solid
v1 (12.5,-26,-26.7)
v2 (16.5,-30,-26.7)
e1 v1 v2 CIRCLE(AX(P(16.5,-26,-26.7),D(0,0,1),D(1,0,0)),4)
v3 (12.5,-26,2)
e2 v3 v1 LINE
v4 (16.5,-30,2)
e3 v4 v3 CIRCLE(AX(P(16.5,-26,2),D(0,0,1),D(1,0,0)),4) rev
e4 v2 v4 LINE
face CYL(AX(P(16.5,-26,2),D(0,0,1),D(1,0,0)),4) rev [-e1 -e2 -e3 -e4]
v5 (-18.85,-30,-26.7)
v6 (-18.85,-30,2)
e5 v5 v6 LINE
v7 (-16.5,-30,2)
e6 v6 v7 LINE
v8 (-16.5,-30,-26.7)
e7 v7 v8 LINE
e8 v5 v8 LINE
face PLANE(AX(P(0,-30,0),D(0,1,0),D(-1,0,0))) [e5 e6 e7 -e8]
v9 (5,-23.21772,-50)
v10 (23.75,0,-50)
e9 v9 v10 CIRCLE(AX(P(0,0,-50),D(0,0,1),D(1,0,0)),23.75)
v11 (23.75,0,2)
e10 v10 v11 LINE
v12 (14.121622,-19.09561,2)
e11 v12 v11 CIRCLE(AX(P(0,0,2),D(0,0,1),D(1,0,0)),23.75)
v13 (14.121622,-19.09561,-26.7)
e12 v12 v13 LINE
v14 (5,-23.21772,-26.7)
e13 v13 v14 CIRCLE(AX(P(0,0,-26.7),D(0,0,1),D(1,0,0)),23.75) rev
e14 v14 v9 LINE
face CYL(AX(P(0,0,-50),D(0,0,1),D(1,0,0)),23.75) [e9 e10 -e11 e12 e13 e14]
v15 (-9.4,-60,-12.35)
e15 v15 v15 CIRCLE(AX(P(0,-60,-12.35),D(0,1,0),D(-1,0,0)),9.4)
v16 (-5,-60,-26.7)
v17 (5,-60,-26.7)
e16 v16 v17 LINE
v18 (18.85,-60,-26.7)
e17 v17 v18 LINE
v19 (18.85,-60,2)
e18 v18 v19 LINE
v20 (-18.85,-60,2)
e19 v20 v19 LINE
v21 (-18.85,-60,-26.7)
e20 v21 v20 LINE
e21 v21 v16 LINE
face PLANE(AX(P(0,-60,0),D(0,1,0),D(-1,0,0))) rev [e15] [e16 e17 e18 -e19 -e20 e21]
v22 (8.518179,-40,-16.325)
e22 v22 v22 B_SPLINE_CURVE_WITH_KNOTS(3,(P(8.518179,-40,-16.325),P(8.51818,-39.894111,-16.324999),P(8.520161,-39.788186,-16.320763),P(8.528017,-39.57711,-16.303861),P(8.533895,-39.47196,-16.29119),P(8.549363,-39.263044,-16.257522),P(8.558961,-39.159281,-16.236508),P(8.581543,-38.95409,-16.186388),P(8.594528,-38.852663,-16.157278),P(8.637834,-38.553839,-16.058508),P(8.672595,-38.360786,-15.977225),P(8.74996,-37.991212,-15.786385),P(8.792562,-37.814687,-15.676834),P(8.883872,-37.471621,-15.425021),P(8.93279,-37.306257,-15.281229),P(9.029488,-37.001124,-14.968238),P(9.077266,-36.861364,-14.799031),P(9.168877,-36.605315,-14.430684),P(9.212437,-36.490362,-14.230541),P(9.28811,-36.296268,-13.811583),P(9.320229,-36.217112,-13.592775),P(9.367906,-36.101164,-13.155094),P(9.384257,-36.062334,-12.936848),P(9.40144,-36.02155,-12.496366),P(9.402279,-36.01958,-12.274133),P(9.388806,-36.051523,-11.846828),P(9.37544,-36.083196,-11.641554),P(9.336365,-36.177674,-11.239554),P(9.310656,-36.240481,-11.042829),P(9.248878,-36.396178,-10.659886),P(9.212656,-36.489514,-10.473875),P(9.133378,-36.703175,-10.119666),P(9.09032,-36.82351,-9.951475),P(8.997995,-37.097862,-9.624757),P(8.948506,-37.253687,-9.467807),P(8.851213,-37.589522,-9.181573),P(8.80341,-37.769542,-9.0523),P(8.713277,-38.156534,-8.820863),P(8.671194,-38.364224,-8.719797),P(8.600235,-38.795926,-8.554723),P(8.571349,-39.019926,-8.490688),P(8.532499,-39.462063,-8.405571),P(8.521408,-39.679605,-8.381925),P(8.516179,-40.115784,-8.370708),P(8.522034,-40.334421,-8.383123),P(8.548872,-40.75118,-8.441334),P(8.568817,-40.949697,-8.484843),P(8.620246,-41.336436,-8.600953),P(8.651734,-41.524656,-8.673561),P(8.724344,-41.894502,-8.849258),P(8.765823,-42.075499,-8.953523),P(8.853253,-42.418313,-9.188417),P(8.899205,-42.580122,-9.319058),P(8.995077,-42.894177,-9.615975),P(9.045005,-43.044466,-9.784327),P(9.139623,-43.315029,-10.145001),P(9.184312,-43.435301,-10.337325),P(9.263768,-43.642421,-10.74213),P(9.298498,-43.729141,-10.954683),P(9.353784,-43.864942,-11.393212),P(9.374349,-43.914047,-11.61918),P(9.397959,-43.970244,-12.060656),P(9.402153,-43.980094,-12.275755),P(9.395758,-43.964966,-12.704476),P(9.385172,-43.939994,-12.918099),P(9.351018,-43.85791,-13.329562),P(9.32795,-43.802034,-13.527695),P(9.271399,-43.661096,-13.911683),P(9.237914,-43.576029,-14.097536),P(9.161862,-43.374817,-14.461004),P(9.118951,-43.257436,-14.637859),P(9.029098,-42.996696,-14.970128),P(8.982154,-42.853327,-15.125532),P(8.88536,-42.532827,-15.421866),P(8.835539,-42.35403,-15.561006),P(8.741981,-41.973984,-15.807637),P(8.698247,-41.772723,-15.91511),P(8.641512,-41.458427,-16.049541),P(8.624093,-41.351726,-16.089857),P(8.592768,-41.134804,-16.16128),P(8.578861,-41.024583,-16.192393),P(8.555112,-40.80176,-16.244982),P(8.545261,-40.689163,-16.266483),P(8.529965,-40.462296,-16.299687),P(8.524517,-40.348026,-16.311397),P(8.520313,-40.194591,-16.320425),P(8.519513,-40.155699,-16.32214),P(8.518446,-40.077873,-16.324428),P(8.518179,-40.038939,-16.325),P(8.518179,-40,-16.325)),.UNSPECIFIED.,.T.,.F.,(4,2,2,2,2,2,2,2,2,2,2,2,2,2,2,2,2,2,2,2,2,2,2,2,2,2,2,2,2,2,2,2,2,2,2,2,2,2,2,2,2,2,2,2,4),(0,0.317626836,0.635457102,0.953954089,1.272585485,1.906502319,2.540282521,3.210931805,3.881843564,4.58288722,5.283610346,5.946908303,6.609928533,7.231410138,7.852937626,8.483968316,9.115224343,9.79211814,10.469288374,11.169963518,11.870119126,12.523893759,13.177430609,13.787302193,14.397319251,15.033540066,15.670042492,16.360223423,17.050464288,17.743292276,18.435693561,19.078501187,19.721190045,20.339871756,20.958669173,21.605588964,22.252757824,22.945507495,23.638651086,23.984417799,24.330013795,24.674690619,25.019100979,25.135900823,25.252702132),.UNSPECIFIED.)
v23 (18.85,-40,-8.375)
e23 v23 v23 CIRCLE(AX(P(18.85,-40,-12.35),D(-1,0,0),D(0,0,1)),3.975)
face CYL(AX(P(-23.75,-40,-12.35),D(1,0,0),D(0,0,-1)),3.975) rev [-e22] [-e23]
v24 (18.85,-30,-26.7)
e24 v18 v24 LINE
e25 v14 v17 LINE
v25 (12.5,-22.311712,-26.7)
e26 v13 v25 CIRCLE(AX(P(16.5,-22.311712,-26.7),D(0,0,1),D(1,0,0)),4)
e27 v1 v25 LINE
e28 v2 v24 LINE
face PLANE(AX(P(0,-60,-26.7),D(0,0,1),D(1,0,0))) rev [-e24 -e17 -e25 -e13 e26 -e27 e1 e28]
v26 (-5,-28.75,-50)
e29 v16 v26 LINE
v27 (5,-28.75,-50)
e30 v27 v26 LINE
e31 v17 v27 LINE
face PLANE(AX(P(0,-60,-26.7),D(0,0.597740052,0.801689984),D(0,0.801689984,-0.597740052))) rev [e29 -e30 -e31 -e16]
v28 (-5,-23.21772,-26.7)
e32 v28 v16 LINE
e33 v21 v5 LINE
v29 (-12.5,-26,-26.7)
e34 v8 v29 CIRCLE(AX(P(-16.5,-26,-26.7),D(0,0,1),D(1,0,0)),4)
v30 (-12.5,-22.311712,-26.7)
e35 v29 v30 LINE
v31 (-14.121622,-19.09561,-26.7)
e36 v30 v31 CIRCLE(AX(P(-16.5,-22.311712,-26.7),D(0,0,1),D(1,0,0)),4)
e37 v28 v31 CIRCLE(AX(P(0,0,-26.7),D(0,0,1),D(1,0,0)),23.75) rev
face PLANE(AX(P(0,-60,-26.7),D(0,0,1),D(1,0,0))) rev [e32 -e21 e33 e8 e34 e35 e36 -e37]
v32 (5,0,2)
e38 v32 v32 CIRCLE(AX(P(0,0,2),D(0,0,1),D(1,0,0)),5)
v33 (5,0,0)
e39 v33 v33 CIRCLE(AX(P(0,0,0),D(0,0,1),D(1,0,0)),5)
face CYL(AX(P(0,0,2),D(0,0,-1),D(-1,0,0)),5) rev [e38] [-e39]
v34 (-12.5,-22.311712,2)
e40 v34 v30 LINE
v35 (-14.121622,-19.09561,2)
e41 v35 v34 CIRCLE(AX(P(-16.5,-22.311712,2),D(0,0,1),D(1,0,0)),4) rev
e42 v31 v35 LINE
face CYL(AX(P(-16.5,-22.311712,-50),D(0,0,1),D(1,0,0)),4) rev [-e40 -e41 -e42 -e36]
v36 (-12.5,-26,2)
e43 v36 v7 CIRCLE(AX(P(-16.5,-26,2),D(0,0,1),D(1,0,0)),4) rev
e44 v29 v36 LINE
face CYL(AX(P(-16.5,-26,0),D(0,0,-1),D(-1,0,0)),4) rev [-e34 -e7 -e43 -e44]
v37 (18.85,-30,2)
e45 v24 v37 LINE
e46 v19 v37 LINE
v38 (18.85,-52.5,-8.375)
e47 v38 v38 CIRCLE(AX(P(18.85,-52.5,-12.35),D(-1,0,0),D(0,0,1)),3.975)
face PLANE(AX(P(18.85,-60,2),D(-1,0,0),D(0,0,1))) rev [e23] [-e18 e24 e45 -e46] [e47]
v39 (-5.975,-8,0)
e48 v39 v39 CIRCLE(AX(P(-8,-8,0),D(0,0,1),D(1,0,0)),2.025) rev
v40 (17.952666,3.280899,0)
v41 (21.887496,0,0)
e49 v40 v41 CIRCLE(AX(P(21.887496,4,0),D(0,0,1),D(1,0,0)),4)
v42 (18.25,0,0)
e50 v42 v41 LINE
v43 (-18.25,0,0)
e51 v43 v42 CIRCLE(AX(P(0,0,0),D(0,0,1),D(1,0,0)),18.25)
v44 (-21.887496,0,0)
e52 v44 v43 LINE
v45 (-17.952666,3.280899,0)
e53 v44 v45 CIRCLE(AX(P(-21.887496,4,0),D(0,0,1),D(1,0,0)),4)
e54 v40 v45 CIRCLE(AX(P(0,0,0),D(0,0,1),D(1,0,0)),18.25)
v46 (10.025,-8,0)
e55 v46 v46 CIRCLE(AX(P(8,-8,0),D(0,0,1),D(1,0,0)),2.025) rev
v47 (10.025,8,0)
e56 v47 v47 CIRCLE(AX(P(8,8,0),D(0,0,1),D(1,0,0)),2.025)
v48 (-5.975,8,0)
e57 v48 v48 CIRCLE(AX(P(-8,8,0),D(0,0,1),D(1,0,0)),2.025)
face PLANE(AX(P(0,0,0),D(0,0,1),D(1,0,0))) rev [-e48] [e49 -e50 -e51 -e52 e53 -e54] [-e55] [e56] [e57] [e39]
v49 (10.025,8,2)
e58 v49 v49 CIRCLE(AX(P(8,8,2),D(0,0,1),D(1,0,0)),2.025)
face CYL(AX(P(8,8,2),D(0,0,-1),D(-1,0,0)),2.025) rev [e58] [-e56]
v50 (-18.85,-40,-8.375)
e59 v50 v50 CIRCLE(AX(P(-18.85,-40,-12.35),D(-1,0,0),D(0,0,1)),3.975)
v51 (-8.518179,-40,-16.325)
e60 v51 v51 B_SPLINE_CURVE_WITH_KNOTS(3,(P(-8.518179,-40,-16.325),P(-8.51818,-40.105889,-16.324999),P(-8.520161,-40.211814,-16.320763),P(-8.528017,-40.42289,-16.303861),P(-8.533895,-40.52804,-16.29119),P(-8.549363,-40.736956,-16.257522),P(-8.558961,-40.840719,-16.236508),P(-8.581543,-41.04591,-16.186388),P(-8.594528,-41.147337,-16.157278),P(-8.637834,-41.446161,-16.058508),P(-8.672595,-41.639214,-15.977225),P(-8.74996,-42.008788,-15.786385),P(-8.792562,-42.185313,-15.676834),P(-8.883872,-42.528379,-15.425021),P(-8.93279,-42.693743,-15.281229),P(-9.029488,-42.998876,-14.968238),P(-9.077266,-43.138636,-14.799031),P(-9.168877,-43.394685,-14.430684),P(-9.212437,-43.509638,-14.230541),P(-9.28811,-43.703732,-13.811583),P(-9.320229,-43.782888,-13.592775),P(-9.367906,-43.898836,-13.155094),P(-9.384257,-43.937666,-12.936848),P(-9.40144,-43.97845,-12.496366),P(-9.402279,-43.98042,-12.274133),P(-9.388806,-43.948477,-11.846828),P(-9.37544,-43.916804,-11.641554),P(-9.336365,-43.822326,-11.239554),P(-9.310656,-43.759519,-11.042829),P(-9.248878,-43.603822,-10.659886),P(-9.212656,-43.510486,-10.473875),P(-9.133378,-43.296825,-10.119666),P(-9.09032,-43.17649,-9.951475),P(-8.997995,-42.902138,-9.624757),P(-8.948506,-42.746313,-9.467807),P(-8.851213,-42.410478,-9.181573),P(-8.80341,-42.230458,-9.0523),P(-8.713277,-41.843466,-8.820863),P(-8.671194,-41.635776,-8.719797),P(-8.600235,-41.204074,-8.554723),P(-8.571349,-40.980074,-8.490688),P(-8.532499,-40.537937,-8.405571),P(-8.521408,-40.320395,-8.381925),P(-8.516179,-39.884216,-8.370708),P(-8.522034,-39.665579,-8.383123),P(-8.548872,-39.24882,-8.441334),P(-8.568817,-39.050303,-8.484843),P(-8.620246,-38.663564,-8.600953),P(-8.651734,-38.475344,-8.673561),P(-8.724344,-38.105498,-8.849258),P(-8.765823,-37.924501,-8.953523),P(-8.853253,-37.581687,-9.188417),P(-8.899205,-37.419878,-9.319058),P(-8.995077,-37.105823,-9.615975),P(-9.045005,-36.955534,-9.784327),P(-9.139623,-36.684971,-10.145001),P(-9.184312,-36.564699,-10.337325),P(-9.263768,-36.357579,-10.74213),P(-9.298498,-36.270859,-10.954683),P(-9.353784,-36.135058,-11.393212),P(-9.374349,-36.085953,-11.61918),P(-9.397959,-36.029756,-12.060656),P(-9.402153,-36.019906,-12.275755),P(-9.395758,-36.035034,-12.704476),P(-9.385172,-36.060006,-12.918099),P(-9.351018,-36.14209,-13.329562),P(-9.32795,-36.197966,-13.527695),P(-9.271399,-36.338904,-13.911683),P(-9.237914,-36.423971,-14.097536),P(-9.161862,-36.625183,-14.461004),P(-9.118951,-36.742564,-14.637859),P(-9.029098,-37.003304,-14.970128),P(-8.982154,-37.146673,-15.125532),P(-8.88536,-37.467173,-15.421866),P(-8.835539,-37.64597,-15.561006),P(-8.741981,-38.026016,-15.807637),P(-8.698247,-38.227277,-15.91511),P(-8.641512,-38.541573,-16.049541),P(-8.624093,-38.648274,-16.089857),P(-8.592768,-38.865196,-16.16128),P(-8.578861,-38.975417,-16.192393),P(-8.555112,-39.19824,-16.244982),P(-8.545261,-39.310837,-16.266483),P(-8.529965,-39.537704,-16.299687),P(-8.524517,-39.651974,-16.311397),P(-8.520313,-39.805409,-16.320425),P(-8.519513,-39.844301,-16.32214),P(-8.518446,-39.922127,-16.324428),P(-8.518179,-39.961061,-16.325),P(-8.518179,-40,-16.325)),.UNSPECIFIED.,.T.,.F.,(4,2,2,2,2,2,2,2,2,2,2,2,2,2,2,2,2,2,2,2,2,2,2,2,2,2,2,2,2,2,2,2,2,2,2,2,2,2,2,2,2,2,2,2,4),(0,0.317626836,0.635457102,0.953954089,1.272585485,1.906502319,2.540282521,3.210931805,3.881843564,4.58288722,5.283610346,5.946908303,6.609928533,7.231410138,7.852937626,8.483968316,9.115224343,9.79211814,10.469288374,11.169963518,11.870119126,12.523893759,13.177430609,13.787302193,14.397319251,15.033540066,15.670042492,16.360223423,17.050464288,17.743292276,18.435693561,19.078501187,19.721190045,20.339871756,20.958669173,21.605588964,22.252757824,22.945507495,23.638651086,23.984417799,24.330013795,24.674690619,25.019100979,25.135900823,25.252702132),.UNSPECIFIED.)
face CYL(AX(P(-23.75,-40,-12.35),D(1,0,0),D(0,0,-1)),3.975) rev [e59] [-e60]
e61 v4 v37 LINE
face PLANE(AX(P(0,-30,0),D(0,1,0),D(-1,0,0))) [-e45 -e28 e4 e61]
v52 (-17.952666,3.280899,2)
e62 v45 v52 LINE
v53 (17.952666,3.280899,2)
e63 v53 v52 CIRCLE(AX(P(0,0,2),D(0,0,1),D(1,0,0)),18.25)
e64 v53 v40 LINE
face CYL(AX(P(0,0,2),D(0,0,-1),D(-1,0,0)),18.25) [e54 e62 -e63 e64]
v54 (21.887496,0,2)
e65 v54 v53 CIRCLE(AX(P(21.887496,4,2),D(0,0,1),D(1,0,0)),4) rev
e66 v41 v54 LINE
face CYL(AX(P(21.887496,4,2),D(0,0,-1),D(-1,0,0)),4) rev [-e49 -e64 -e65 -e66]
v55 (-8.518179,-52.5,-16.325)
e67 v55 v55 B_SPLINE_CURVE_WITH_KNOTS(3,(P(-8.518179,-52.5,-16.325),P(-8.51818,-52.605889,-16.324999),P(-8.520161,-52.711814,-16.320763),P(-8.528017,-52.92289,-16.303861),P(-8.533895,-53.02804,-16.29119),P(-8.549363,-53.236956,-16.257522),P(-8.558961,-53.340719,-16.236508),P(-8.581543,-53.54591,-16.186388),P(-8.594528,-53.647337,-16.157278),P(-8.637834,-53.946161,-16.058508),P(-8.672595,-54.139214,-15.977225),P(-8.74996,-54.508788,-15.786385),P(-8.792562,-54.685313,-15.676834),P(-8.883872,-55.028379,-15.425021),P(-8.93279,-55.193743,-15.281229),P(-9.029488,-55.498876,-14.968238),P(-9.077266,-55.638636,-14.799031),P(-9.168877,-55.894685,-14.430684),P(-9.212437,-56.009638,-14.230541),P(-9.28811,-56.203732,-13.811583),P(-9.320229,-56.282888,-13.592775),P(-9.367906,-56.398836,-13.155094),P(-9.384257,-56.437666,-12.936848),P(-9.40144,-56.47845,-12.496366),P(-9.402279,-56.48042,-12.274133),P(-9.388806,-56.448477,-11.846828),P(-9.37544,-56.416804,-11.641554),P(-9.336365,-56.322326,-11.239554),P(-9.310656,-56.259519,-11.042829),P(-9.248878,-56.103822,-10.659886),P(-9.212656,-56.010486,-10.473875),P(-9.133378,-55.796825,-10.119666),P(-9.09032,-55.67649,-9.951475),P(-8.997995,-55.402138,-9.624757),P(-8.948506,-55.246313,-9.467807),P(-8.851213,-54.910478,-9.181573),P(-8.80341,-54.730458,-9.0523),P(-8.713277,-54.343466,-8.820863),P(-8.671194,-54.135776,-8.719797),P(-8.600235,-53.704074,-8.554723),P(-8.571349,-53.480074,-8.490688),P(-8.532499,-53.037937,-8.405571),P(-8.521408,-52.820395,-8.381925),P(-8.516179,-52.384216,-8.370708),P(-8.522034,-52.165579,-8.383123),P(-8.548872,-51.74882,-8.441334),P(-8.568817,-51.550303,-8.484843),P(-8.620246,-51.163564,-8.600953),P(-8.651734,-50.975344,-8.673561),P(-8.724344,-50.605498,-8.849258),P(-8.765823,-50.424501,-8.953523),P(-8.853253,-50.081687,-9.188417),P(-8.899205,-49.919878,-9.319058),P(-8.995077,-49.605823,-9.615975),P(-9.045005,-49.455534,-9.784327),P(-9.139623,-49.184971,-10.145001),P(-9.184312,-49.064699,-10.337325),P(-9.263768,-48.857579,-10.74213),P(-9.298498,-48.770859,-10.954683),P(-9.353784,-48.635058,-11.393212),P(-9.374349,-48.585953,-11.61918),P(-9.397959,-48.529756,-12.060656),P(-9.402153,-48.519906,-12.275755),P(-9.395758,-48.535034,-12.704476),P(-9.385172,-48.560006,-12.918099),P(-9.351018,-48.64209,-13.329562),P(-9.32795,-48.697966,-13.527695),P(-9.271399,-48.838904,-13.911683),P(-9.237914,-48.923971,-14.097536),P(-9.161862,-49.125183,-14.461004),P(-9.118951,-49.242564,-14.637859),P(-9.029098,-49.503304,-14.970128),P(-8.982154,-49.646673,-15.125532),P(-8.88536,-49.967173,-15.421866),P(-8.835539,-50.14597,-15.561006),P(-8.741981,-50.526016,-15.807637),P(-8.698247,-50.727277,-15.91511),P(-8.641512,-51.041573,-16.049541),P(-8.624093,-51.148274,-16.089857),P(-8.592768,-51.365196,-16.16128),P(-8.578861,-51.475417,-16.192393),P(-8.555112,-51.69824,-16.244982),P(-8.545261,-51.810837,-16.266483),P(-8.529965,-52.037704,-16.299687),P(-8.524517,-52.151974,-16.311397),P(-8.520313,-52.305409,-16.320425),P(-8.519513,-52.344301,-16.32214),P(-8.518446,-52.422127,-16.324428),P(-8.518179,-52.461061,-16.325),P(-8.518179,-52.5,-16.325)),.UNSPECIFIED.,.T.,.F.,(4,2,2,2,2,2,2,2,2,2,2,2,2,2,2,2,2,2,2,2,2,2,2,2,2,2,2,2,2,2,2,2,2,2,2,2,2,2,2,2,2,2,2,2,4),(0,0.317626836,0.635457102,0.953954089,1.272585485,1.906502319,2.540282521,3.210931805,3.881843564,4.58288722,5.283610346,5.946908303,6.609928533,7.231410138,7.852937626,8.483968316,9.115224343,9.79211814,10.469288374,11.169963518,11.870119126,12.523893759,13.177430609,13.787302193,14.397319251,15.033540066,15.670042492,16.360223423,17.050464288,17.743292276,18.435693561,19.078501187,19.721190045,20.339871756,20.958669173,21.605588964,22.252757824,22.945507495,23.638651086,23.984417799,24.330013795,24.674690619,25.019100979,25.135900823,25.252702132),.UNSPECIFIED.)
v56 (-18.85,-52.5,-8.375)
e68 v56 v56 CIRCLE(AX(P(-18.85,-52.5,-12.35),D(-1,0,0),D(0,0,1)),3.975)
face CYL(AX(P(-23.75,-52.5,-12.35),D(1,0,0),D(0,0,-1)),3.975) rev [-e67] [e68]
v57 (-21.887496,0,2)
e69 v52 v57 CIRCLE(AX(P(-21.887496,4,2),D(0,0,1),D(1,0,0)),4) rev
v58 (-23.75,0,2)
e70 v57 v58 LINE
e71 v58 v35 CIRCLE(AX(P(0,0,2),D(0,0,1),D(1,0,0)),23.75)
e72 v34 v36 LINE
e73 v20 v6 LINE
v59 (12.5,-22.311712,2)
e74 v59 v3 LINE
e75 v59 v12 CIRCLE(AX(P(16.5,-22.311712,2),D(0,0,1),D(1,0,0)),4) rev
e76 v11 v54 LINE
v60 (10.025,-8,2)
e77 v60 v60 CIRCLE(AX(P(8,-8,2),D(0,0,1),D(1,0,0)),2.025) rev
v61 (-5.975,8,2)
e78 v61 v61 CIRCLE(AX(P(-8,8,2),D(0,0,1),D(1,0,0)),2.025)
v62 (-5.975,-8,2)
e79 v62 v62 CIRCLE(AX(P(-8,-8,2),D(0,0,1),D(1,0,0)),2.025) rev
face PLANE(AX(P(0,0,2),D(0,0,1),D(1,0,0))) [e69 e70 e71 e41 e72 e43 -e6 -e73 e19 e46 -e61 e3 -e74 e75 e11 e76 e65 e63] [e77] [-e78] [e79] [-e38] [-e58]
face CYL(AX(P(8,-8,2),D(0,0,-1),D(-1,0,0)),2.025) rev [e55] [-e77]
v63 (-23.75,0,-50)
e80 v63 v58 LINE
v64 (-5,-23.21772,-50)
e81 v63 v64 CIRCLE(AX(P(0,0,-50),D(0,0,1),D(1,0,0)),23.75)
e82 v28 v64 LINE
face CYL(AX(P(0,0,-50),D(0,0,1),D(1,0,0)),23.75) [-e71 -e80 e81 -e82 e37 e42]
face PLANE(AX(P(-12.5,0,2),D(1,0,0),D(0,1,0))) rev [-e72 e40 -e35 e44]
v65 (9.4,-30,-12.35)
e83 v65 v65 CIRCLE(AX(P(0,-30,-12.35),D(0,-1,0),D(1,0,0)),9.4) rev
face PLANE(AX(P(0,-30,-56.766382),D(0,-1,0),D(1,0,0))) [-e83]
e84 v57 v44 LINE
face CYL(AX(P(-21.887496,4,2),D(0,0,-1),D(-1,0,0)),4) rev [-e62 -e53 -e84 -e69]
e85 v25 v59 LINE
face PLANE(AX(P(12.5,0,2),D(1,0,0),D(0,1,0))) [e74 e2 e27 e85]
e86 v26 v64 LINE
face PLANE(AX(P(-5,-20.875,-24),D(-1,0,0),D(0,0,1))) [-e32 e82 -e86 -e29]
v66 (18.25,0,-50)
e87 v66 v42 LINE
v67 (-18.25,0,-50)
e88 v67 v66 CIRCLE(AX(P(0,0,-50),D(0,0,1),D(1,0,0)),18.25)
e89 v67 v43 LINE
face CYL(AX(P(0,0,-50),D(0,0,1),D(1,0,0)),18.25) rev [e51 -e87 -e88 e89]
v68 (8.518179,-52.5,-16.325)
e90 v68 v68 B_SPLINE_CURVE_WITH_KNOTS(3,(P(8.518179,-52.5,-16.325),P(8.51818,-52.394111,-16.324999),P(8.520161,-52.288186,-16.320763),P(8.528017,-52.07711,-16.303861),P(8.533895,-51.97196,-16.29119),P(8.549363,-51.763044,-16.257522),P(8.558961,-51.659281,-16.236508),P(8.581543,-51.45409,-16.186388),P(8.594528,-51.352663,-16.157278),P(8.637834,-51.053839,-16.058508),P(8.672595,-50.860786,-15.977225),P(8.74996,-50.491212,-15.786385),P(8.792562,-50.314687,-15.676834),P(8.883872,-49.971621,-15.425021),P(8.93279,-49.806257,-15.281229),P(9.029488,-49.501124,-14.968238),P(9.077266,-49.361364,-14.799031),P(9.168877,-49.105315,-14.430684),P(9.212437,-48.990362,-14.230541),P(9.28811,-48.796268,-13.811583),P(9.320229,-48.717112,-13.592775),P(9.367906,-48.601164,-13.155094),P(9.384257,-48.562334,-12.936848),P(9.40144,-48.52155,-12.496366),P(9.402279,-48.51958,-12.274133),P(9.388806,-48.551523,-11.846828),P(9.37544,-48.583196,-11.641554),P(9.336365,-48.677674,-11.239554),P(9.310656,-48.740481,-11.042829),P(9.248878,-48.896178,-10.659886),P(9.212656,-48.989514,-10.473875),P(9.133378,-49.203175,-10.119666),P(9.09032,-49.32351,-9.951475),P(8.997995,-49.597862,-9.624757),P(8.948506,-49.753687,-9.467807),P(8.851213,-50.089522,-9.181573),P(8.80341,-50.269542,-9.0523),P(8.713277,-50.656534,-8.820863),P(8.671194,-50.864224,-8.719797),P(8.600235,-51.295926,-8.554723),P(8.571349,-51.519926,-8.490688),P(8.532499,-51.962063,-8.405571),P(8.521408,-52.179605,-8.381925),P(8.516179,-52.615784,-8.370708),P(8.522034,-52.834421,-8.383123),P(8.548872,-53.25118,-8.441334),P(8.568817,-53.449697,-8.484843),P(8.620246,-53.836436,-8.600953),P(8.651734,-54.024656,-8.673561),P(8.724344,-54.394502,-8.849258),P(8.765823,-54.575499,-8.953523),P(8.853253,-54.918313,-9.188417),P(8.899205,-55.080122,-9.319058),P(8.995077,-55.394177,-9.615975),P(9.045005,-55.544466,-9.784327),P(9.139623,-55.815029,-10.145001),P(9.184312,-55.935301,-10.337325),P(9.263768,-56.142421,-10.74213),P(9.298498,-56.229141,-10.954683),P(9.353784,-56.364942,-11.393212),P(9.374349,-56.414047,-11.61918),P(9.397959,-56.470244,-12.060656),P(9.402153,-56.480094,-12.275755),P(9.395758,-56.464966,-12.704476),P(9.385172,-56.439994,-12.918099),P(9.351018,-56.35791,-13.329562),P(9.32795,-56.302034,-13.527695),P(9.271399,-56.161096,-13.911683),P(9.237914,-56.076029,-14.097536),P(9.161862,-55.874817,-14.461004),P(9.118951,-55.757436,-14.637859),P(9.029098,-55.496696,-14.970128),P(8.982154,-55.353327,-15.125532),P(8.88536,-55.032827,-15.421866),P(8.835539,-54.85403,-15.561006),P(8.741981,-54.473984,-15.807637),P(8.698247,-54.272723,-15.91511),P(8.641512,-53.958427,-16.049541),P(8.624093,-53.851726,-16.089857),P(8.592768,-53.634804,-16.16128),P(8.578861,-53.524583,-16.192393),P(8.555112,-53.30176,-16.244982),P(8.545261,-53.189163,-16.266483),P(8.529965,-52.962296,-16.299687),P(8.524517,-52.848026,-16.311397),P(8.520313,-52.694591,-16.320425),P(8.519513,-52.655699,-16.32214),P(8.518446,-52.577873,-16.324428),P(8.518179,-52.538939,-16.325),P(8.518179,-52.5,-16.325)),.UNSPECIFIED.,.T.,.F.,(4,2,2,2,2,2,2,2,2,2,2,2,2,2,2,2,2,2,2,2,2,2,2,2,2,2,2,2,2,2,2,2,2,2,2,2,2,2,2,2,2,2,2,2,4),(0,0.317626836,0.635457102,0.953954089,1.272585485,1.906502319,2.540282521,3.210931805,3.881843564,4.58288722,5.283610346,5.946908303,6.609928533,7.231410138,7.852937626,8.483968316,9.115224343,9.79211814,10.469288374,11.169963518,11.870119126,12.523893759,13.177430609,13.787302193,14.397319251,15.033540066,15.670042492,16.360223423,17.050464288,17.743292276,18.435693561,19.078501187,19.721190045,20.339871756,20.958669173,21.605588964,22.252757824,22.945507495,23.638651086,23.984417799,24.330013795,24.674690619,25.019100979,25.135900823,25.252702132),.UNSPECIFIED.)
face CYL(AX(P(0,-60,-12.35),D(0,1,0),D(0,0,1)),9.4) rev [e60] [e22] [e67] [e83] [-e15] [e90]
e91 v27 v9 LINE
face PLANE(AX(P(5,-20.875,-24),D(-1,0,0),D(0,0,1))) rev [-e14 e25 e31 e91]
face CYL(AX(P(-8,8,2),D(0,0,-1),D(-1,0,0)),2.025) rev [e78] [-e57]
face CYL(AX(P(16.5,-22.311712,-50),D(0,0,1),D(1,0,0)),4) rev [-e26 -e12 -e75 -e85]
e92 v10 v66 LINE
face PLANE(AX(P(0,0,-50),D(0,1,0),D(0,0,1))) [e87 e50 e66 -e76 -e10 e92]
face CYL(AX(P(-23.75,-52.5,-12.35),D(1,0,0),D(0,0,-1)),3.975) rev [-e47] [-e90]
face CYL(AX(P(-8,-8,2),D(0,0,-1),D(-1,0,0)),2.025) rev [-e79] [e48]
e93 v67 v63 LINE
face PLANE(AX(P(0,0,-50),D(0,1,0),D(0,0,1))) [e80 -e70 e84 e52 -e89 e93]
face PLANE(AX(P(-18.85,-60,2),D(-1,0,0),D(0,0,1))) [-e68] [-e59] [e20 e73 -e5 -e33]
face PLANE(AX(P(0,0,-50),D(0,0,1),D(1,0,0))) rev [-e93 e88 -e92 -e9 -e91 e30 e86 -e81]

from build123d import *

# Parameters (mm, degrees)
SKETCH2_R               = 2.025
SKETCH2_R_2             = 5
BOSS_EXTRUDE3_DEPTH     = 2
BOSS_EXTRUDE4_START     = -50
BOSS_EXTRUDE4_DEPTH     = 52
BOSS_EXTRUDE6_START     = -30
SKETCH7_W               = 37.7
SKETCH7_H               = 28.7
SKETCH7_R               = 9.4
BOSS_EXTRUDE6_DEPTH     = 30
BOSS_EXTRUDE7_START     = -26.7
BOSS_EXTRUDE7_DEPTH     = 26.7
CUT_EXTRUDE1_DEPTH      = 82.633709336
CUT_EXTRUDE1_DEPTH_BACK = 82.633709336
SKETCH6_R               = 3.975
RIB3_START              = -5
RIB3_DEPTH              = 10
FILLET2_R               = 4


# Read off the part's stored shape, not the designer's step: Rib3
with BuildPart() as part:
    # Sketch2 → Boss-Extrude3 (new body)
    with BuildSketch(Plane.XY):
        with BuildLine():
            Line((12.5, -30), (12.5, -13.297086147))
            ThreePointArc((12.5, -13.297086147), (0, 18.25), (-12.5, -13.297086147))
            Line((-12.5, -13.297086147), (-12.5, -30))
            Line((-12.5, -30), (12.5, -30))
        make_face()
        with Locations((8, 8)):
            Circle(SKETCH2_R, mode=Mode.SUBTRACT)
        with Locations((-8, -8)):
            Circle(SKETCH2_R, mode=Mode.SUBTRACT)
        with Locations((-8, 8)):
            Circle(SKETCH2_R, mode=Mode.SUBTRACT)
        with Locations((8, -8)):
            Circle(SKETCH2_R, mode=Mode.SUBTRACT)
        Circle(SKETCH2_R_2, mode=Mode.SUBTRACT)
    extrude(amount=BOSS_EXTRUDE3_DEPTH)

    # Sketch3 → Boss-Extrude4 (add)
    with BuildSketch(Plane.XY.offset(BOSS_EXTRUDE4_START)):
        with BuildLine():
            Line((23.75, 0), (18.25, 0))
            ThreePointArc((18.25, 0), (0, -18.25), (-18.25, 0))
            Line((-18.25, 0), (-23.75, 0))
            ThreePointArc((-23.75, 0), (0, -23.75), (23.75, 0))
        make_face()
    extrude(amount=BOSS_EXTRUDE4_DEPTH)

    # Sketch7 → Boss-Extrude6 (add)
    with BuildSketch(Plane(origin=(0, 0, 0), x_dir=(1, 0, 0), z_dir=(0, 1, 0)).offset(BOSS_EXTRUDE6_START)):
        with Locations((0, 12.35)):
            Rectangle(SKETCH7_W, SKETCH7_H)
        with Locations(Location((0, 12.35, 0), (0, 0, 180))):
            Circle(SKETCH7_R, mode=Mode.SUBTRACT)
    extrude(amount=-BOSS_EXTRUDE6_DEPTH)

    # Sketch2<8> → Boss-Extrude7 (add)
    with BuildSketch(Plane.XY.offset(BOSS_EXTRUDE7_START)):
        with BuildLine():
            Line((12.5, -30), (12.5, -13.297086147))
            ThreePointArc((12.5, -13.297086147), (0, -18.25), (-12.5, -13.297086147))
            Line((-12.5, -13.297086147), (-12.5, -30))
            Line((-12.5, -30), (12.5, -30))
        make_face()
    extrude(amount=BOSS_EXTRUDE7_DEPTH)

    # Sketch6 → Cut-Extrude1 (cut, two sides: drawn at the far end of the back side and taken through both)
    with BuildSketch(Plane(origin=(0, 0, 0), x_dir=(0, 0, -1), z_dir=(1, 0, 0)).offset(-CUT_EXTRUDE1_DEPTH_BACK)):
        with Locations((12.35, -40)):
            Circle(SKETCH6_R)
        with Locations((12.35, -52.5)):
            Circle(SKETCH6_R)
    extrude(amount=CUT_EXTRUDE1_DEPTH + CUT_EXTRUDE1_DEPTH_BACK, mode=Mode.SUBTRACT)

    # Rib3 outline → Rib3 (add)
    with BuildSketch(Plane(origin=(0, -60, 0), x_dir=(0, -1, 0), z_dir=(-1, 0, 0)).offset(RIB3_START)):
        Polygon((-38, -50), (-31.25, -50), (0, -26.7), (-38, -26.7), align=None)
    extrude(amount=RIB3_DEPTH)

    # Fillet2
    fillet2_edges = [part.edges().sort_by_distance(p)[0] for p in [
        (12.5, -30, -12.35),
        (-12.5, -30, -12.35),
        (-18.25, 0, 1),
        (12.5, -20.194368027, -12.35),
        (18.25, 0, 1),
        (-12.5, -20.194368027, -12.35),
    ]]
    fillet(fillet2_edges, radius=FILLET2_R)


solid = part.part
